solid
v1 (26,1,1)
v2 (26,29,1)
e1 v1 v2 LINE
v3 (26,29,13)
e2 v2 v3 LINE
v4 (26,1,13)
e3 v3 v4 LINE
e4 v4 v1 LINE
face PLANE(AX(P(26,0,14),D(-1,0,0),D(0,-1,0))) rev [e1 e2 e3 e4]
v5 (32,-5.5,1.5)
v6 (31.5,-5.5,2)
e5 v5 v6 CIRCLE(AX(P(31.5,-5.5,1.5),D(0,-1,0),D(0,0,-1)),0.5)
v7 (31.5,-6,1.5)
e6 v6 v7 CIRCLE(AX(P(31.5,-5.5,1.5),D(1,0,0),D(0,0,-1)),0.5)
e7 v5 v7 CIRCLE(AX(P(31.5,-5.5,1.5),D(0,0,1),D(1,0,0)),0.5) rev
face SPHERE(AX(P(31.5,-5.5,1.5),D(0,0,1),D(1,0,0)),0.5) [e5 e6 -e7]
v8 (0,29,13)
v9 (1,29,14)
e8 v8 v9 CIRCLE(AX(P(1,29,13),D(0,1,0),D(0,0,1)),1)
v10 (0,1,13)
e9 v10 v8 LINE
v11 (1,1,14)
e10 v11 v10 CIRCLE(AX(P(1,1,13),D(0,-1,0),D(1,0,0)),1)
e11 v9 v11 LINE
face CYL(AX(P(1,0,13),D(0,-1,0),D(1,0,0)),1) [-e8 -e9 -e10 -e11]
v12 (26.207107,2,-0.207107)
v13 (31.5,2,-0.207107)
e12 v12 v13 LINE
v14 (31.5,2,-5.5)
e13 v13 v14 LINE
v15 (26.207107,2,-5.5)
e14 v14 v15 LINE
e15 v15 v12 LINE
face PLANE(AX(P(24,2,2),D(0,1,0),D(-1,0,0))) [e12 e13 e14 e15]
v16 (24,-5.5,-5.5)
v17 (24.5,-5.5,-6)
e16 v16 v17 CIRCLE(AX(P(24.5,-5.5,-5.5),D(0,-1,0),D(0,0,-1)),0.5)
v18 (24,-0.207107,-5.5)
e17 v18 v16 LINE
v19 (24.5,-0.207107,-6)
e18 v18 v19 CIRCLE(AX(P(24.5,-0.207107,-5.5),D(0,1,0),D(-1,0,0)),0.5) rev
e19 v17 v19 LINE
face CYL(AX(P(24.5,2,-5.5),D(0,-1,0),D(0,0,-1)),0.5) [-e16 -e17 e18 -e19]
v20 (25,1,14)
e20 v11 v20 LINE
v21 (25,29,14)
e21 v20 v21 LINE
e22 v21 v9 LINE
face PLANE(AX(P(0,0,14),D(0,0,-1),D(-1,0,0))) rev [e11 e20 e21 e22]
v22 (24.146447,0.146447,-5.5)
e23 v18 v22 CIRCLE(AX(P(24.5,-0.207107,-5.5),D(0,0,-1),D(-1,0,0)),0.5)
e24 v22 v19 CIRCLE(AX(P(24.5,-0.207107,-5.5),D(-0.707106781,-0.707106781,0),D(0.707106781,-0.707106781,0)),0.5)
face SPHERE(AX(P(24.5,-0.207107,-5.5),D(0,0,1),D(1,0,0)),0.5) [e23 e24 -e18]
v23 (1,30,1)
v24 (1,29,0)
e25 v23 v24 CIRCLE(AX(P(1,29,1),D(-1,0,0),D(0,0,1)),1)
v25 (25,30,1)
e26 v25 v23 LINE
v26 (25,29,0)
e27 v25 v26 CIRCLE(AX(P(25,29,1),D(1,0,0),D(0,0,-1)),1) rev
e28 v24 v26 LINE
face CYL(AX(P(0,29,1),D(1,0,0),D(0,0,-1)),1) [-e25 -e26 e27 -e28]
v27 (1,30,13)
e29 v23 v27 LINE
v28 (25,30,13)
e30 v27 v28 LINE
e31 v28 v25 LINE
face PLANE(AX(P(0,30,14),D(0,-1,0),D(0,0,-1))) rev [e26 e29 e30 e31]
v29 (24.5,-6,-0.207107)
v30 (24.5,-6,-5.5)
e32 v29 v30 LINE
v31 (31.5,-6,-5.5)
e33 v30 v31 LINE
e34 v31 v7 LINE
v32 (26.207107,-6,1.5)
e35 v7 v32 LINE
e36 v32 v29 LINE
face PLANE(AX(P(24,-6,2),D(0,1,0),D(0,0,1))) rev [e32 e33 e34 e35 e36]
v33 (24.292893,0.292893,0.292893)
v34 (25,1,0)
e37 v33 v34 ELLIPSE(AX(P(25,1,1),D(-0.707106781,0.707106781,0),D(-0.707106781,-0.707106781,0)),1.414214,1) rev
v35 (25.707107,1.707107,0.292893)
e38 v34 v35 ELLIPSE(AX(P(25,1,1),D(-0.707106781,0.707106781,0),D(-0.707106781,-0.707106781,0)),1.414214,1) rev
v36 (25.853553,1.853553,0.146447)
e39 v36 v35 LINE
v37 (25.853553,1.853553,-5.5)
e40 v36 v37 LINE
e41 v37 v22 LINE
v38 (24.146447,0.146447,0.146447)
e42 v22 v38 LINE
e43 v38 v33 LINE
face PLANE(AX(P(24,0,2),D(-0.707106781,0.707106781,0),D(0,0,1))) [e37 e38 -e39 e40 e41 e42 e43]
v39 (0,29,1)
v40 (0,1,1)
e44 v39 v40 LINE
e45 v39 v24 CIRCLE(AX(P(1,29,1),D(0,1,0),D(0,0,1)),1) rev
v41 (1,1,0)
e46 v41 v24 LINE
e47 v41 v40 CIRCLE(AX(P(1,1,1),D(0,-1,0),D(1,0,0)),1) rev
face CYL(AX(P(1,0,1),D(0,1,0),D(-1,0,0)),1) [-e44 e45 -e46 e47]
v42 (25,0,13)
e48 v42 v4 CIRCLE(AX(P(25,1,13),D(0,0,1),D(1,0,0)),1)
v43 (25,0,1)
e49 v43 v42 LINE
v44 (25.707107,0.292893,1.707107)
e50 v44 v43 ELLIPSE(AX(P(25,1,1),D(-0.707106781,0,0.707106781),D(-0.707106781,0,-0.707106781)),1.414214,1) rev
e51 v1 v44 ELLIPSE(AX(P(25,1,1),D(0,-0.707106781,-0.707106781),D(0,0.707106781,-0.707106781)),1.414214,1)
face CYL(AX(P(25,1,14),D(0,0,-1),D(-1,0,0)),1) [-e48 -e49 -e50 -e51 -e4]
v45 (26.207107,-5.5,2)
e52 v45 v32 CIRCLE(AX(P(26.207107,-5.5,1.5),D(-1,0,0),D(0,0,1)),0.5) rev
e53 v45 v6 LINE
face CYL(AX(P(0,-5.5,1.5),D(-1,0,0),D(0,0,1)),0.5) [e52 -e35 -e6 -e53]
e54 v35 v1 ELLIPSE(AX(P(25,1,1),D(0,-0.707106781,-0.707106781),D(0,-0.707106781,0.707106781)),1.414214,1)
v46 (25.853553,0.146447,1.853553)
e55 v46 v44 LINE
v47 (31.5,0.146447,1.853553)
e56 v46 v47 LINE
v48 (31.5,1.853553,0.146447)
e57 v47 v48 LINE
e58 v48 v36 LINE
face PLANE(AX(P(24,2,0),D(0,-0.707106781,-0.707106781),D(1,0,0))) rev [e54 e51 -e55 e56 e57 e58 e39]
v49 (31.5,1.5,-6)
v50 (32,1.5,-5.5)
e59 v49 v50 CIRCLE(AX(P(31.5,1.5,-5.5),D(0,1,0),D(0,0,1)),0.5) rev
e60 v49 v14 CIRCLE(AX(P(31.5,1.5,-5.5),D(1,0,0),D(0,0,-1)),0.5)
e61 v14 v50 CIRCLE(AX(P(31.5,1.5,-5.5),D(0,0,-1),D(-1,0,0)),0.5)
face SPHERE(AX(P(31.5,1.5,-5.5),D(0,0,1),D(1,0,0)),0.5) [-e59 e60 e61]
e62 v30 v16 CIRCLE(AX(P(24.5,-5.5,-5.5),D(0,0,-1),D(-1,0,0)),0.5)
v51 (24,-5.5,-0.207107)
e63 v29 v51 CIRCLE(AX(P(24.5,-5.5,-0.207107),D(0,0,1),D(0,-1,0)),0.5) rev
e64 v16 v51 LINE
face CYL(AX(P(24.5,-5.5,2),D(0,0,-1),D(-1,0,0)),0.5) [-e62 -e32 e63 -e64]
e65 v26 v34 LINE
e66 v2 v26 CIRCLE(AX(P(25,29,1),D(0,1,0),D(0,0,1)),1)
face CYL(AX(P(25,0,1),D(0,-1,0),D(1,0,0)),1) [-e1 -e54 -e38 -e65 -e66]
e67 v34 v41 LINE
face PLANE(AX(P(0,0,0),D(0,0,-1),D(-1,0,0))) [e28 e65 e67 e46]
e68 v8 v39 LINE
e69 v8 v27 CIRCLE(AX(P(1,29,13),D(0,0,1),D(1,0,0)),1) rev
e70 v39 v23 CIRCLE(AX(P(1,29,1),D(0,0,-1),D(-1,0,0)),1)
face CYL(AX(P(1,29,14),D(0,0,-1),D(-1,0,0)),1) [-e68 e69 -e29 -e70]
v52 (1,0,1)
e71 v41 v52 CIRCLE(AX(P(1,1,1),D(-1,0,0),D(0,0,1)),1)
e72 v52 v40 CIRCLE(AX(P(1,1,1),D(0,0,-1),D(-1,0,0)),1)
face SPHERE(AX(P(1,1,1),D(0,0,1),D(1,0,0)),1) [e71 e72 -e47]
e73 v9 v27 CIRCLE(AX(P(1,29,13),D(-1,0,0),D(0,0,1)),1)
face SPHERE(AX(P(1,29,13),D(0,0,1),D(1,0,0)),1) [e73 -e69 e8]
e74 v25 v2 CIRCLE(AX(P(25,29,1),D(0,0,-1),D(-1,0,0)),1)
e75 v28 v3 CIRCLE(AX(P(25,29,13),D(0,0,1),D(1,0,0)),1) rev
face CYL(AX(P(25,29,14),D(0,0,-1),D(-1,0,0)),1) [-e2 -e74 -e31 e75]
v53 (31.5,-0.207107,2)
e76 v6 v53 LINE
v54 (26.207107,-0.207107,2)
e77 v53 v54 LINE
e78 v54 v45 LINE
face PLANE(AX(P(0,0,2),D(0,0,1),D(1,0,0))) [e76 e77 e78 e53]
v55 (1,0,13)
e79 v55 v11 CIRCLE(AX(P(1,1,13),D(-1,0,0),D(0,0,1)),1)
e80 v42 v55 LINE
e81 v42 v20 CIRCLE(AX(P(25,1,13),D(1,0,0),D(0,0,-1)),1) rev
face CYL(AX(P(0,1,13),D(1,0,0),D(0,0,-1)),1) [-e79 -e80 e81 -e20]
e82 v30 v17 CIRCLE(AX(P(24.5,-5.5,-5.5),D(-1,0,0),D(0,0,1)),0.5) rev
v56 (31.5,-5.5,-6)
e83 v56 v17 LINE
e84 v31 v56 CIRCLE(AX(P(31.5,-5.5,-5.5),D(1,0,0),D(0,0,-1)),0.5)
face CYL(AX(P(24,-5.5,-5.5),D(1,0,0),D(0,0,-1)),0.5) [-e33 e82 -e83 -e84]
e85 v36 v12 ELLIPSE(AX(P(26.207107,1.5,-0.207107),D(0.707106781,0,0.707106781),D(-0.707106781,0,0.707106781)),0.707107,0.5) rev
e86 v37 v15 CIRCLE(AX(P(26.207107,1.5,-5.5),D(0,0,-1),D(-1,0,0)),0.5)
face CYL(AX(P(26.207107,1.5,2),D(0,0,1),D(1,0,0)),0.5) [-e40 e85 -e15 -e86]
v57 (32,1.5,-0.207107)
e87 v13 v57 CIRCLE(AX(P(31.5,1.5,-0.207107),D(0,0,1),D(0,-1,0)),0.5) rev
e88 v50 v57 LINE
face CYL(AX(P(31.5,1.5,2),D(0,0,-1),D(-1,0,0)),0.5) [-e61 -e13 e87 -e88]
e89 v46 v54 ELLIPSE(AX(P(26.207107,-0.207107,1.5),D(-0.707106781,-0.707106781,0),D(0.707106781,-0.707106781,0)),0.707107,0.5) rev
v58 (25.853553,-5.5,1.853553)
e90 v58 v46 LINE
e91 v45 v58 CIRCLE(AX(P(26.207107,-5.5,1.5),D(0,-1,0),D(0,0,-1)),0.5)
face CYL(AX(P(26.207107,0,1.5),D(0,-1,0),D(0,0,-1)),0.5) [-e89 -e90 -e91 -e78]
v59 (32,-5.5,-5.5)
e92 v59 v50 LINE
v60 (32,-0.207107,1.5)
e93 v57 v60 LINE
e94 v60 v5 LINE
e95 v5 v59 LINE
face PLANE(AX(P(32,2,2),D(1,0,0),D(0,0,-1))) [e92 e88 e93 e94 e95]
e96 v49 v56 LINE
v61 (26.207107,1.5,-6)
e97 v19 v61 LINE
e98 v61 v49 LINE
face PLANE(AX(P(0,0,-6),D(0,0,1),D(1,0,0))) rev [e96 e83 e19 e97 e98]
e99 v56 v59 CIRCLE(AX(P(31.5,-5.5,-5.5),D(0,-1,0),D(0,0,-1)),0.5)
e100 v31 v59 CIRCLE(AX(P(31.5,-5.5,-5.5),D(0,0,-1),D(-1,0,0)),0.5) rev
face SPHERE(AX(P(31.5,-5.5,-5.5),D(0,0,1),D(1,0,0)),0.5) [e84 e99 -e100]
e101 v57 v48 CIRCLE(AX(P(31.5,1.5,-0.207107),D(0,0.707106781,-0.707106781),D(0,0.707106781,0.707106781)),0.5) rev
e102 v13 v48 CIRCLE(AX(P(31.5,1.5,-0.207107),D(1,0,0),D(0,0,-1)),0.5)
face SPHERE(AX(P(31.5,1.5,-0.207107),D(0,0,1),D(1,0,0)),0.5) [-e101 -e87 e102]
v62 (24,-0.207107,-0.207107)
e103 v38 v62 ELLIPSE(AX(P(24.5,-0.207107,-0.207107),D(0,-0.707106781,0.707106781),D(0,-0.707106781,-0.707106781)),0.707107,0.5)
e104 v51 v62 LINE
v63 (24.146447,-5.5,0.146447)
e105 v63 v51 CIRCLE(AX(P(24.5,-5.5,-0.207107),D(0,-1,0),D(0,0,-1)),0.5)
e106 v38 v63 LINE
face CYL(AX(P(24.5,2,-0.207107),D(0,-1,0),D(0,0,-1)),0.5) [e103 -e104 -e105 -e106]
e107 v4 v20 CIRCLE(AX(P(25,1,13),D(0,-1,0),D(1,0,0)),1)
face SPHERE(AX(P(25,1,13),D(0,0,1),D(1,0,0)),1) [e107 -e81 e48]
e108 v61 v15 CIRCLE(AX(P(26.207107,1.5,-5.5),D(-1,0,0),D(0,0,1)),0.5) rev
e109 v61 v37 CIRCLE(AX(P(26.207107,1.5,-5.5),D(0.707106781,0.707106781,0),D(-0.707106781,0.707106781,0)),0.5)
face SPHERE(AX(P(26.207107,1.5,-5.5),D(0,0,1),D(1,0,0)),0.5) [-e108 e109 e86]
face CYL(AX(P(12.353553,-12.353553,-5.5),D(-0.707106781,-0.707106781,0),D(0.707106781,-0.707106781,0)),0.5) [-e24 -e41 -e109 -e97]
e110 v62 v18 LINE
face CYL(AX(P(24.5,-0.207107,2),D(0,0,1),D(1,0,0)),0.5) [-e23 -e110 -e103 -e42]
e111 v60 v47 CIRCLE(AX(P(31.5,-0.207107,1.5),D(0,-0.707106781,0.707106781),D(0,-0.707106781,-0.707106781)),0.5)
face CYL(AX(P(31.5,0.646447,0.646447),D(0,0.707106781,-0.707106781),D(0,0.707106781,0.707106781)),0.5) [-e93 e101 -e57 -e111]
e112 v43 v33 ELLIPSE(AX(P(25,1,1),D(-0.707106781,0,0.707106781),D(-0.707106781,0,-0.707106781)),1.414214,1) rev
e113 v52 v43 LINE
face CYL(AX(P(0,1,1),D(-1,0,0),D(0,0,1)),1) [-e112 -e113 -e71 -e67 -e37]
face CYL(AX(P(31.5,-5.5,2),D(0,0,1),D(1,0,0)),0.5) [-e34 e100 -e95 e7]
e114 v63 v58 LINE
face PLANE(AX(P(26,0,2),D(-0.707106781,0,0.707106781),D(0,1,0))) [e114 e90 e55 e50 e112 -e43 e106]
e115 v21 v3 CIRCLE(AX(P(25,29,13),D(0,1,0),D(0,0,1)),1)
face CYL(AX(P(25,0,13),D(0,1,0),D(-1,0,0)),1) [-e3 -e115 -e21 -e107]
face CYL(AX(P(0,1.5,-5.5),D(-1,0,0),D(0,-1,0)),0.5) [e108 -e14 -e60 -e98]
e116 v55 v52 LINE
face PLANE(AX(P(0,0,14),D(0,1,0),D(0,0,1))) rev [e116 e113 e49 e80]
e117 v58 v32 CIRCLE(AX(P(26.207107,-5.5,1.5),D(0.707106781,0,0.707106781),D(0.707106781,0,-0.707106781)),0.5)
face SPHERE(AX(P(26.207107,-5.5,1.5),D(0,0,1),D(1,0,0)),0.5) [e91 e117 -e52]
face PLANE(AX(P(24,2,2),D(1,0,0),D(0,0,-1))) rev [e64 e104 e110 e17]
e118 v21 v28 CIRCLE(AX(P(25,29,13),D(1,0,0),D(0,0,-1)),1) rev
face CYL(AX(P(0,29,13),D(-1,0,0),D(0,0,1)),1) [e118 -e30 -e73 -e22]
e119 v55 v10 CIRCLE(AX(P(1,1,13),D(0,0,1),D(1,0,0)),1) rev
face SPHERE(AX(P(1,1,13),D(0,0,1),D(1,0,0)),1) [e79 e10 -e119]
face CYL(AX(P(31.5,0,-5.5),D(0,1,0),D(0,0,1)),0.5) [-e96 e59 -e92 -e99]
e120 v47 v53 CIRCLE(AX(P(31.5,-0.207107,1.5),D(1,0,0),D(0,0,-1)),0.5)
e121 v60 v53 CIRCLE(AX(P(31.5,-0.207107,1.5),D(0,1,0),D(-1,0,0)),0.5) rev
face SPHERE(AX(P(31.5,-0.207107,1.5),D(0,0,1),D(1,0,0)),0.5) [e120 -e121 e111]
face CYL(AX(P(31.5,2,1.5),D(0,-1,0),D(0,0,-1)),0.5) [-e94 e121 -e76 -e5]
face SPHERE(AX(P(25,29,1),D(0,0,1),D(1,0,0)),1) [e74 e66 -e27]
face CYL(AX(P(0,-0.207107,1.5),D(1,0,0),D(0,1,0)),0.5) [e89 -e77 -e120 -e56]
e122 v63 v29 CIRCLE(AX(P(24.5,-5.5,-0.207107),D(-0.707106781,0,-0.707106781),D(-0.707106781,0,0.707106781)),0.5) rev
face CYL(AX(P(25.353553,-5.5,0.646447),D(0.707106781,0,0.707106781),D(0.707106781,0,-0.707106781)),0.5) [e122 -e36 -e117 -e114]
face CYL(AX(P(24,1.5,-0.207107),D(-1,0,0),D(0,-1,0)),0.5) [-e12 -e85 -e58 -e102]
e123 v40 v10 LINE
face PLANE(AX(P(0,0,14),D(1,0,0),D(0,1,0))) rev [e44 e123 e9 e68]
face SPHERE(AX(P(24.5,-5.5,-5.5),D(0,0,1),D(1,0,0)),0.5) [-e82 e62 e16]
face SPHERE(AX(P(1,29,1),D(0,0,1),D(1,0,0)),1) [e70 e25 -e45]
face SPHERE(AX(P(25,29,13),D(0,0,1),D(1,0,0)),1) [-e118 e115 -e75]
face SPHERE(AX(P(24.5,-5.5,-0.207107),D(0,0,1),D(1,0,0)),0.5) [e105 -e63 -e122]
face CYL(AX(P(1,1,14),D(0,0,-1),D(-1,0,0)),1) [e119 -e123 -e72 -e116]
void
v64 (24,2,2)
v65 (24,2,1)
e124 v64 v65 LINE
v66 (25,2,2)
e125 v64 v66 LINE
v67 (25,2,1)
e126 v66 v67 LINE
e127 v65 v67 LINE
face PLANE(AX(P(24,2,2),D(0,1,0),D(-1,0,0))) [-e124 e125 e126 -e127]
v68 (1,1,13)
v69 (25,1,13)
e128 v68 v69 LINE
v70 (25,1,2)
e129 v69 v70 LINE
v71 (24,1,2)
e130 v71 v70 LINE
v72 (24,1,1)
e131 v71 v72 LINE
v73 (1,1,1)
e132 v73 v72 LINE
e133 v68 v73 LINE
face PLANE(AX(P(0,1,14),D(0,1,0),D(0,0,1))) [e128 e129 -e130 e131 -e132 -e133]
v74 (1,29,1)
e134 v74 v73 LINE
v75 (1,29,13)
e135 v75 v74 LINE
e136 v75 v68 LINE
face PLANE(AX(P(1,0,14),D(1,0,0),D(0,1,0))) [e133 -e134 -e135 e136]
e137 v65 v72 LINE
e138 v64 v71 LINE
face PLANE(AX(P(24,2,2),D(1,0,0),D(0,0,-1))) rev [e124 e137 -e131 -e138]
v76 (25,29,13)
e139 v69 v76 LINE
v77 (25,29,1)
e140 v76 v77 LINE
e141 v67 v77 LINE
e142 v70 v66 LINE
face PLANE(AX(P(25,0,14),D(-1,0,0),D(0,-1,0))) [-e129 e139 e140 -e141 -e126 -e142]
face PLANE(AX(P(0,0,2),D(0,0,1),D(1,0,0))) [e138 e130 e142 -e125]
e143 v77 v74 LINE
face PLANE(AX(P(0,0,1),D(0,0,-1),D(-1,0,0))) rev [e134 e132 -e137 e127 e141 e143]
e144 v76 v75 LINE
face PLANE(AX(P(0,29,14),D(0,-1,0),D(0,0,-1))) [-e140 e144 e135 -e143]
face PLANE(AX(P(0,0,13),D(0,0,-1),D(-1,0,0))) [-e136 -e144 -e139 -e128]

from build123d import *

# Parameters (mm, degrees)
SKETCH1_W                = 26
SKETCH1_H                = 30
BOSS_EXTRUDE1_DEPTH      = 14
SHELL1_T                 = 1
BOSS_EXTRUDE3_DEPTH      = 6
BOSS_EXTRUDE3_DEPTH_BACK = 2
SKETCH2_W                = 8
SKETCH2_H                = 8
CHAMFER2_SIZE            = 2
FILLET1_R                = 1
FILLET2_R                = 0.5


with BuildPart() as part:
    # Sketch1 → Boss-Extrude1 (new body)
    with BuildSketch(Plane.XY):
        with Locations((13, 15)):
            Rectangle(SKETCH1_W, SKETCH1_H)
    extrude(amount=BOSS_EXTRUDE1_DEPTH)

    # Shell1 (no face opened: a closed hollow body)
    add(offset(amount=-SHELL1_T, mode=Mode.PRIVATE), mode=Mode.SUBTRACT)

    # Sketch2 → Boss-Extrude3 (add, two sides: drawn at the far end of the back side and taken through both)
    with BuildSketch(Plane(origin=(0, 0, 0), x_dir=(-1, 0, 0), z_dir=(0, 0, -1)).offset(-BOSS_EXTRUDE3_DEPTH_BACK)):
        with Locations((-28, -2)):
            Rectangle(SKETCH2_W, SKETCH2_H)
    extrude(amount=BOSS_EXTRUDE3_DEPTH + BOSS_EXTRUDE3_DEPTH_BACK)

    # Chamfer2
    chamfer2_edges = [part.edges().sort_by_distance(p)[0] for p in [
        (24, -3, 2),
        (24, 2, -3),
        (29, 2, 2),
    ]]
    chamfer(chamfer2_edges, length=CHAMFER2_SIZE)

    # Fillet1
    # the kernel refuses this fillet: 1 mm, written as the material it takes off along each edge
    with BuildSketch(Plane(origin=(1, 29, 1), x_dir=(0, 1, 0), z_dir=(0, 0, -1))) as fillet1_piece_1_section:
        Polygon((0, 0), (FILLET1_R, 0), (FILLET1_R, -FILLET1_R), (0, -FILLET1_R), align=None)
    fillet1_piece_1 = extrude(amount=FILLET1_R, mode=Mode.PRIVATE)
    fillet1_piece_1 = fillet1_piece_1 - Plane(origin=(1, 29, 1), x_dir=(0.7071067811865476, -0.7071067811865475, 0), z_dir=(0, 0, -1)) * Sphere(FILLET1_R, mode=Mode.PRIVATE)
    add(fillet1_piece_1, mode=Mode.SUBTRACT)
    with BuildSketch(Plane(origin=(1, 1, 1), x_dir=(0, 0, -1), z_dir=(0, -1, 0))) as fillet1_piece_2_section:
        Polygon((0, 0), (FILLET1_R, 0), (FILLET1_R, -FILLET1_R), (0, -FILLET1_R), align=None)
    fillet1_piece_2 = extrude(amount=FILLET1_R, mode=Mode.PRIVATE)
    fillet1_piece_2 = fillet1_piece_2 - Plane(origin=(1, 1, 1), x_dir=(0.7071067811865475, 0, 0.7071067811865475), z_dir=(0, -1, 0)) * Sphere(FILLET1_R, mode=Mode.PRIVATE)
    add(fillet1_piece_2, mode=Mode.SUBTRACT)
    with BuildSketch(Plane(origin=(25, 29, 1), x_dir=(0, 0, -1), z_dir=(0, 1, 0))) as fillet1_piece_3_section:
        Polygon((0, 0), (FILLET1_R, 0), (FILLET1_R, -FILLET1_R), (0, -FILLET1_R), align=None)
    fillet1_piece_3 = extrude(amount=FILLET1_R, mode=Mode.PRIVATE)
    fillet1_piece_3 = fillet1_piece_3 - Plane(origin=(25, 29, 1), x_dir=(-0.7071067811865475, 0, 0.7071067811865475), z_dir=(0, 1, 0)) * Sphere(FILLET1_R, mode=Mode.PRIVATE)
    add(fillet1_piece_3, mode=Mode.SUBTRACT)
    with BuildSketch(Plane(origin=(1, 1, 13), x_dir=(-1, 0, 0), z_dir=(0, -1, 0))) as fillet1_piece_4_section:
        Polygon((0, 0), (FILLET1_R, 0), (FILLET1_R, -FILLET1_R), (0, -FILLET1_R), align=None)
    fillet1_piece_4 = extrude(amount=FILLET1_R, mode=Mode.PRIVATE)
    fillet1_piece_4 = fillet1_piece_4 - Plane(origin=(1, 1, 13), x_dir=(0.7071067811865475, 0, -0.7071067811865475), z_dir=(0, -1, 0)) * Sphere(FILLET1_R, mode=Mode.PRIVATE)
    add(fillet1_piece_4, mode=Mode.SUBTRACT)
    with BuildSketch(Plane(origin=(25, 1, 13), x_dir=(1, 0, 0), z_dir=(0, -1, 0))) as fillet1_piece_5_section:
        Polygon((0, 0), (FILLET1_R, 0), (FILLET1_R, FILLET1_R), (0, FILLET1_R), align=None)
    fillet1_piece_5 = extrude(amount=FILLET1_R, mode=Mode.PRIVATE)
    fillet1_piece_5 = fillet1_piece_5 - Plane(origin=(25, 1, 13), x_dir=(-0.7071067811865475, 0, -0.7071067811865475), z_dir=(0, -1, 0)) * Sphere(FILLET1_R, mode=Mode.PRIVATE)
    add(fillet1_piece_5, mode=Mode.SUBTRACT)
    with BuildSketch(Plane(origin=(25, 29, 13), x_dir=(1, 0, 0), z_dir=(0, 1, 0))) as fillet1_piece_6_section:
        Polygon((0, 0), (FILLET1_R, 0), (FILLET1_R, -FILLET1_R), (0, -FILLET1_R), align=None)
    fillet1_piece_6 = extrude(amount=FILLET1_R, mode=Mode.PRIVATE)
    fillet1_piece_6 = fillet1_piece_6 - Plane(origin=(25, 29, 13), x_dir=(-0.7071067811865475, 0, -0.7071067811865475), z_dir=(0, 1, 0)) * Sphere(FILLET1_R, mode=Mode.PRIVATE)
    add(fillet1_piece_6, mode=Mode.SUBTRACT)
    with BuildSketch(Plane(origin=(1, 29, 13), x_dir=(-1, 0, 0), z_dir=(0, 1, 0))) as fillet1_piece_7_section:
        Polygon((0, 0), (FILLET1_R, 0), (FILLET1_R, FILLET1_R), (0, FILLET1_R), align=None)
    fillet1_piece_7 = extrude(amount=FILLET1_R, mode=Mode.PRIVATE)
    fillet1_piece_7 = fillet1_piece_7 - Plane(origin=(1, 29, 13), x_dir=(0.7071067811865475, 0, -0.7071067811865475), z_dir=(0, 1, 0)) * Sphere(FILLET1_R, mode=Mode.PRIVATE)
    add(fillet1_piece_7, mode=Mode.SUBTRACT)
    with BuildSketch(Plane(origin=(0, 29, 0), x_dir=(1, 0, 0), z_dir=(0, -1, 0)), Plane(origin=(26, 1, 14), x_dir=(0, 0, -1), z_dir=(0, 1, 0)), Plane(origin=(0, 29, 14), x_dir=(0, 0, -1), z_dir=(0, -1, 0))) as fillet1_piece_8:
        with BuildLine():
            CenterArc((FILLET1_R, FILLET1_R), FILLET1_R, 180, 90)
            Line((0, FILLET1_R), (0, 0))
            Line((0, 0), (FILLET1_R, 0))
        make_face()
    extrude(amount=28, mode=Mode.SUBTRACT)
    with BuildSketch(Plane(origin=(1, 0, 0), x_dir=(0, 0, 1), z_dir=(1, 0, 0))) as fillet1_piece_9_section:
        with BuildLine():
            CenterArc((FILLET1_R, -FILLET1_R), FILLET1_R, 90, 90)
            Line((0, -FILLET1_R), (0, 0))
            Line((0, 0), (FILLET1_R, 0))
        make_face()
    fillet1_piece_9 = extrude(amount=25.5, mode=Mode.PRIVATE)
    fillet1_piece_9 = split(fillet1_piece_9, bisect_by=Plane(origin=(18.381826638, 0.226414546, -5.618173362), z_dir=(-0.7071067811865476, 0, 0.7071067811865476)), keep=Keep.TOP, mode=Mode.PRIVATE)
    fillet1_piece_9 = split(fillet1_piece_9, bisect_by=Plane(origin=(18.381826638, -5.618173362, 0.226414546), z_dir=(-0.7071067811865476, 0.7071067811865476, 0)), keep=Keep.TOP, mode=Mode.PRIVATE)
    add(fillet1_piece_9, mode=Mode.SUBTRACT)
    with BuildSketch(Plane(origin=(1, 0, 0), x_dir=(0, 0, 1), z_dir=(1, 0, 0))) as fillet1_piece_10_section:
        with BuildLine():
            CenterArc((FILLET1_R, -FILLET1_R), FILLET1_R, 90, 90)
            Line((0, -FILLET1_R), (0, 0))
            Line((0, 0), (FILLET1_R, 0))
        make_face()
    fillet1_piece_10 = extrude(amount=25.5, mode=Mode.PRIVATE)
    fillet1_piece_10 = split(fillet1_piece_10, bisect_by=Plane(origin=(24.16446835, 0.528927527, 0.16446835), z_dir=(0.7071067811865476, 0, -0.7071067811865476)), keep=Keep.TOP, mode=Mode.PRIVATE)
    fillet1_piece_10 = split(fillet1_piece_10, bisect_by=Plane(origin=(24.407441135, 0.407441135, 0.042981958), z_dir=(-0.7071067811865476, 0.7071067811865476, 0)), keep=Keep.TOP, mode=Mode.PRIVATE)
    add(fillet1_piece_10, mode=Mode.SUBTRACT)
    with BuildSketch(Plane(origin=(1, 0, 0), x_dir=(0, 0, 1), z_dir=(1, 0, 0))) as fillet1_piece_11_section:
        with BuildLine():
            CenterArc((FILLET1_R, -FILLET1_R), FILLET1_R, 90, 90)
            Line((0, -FILLET1_R), (0, 0))
            Line((0, 0), (FILLET1_R, 0))
        make_face()
    fillet1_piece_11 = extrude(amount=25.5, mode=Mode.PRIVATE)
    fillet1_piece_11 = split(fillet1_piece_11, bisect_by=Plane(origin=(24.407441135, 0.042981958, 0.407441135), z_dir=(-0.7071067811865476, 0, 0.7071067811865476)), keep=Keep.TOP, mode=Mode.PRIVATE)
    fillet1_piece_11 = split(fillet1_piece_11, bisect_by=Plane(origin=(24.16446835, 0.16446835, 0.528927527), z_dir=(0.7071067811865476, -0.7071067811865476, 0)), keep=Keep.TOP, mode=Mode.PRIVATE)
    add(fillet1_piece_11, mode=Mode.SUBTRACT)
    with BuildSketch(Plane(origin=(26, -0.5, 0), x_dir=(-1, 0, 0), z_dir=(0, 1, 0))) as fillet1_piece_12_section:
        with BuildLine():
            CenterArc((FILLET1_R, FILLET1_R), FILLET1_R, 180, 90)
            Line((0, FILLET1_R), (0, 0))
            Line((0, 0), (FILLET1_R, 0))
        make_face()
    fillet1_piece_12 = extrude(amount=29.5, mode=Mode.PRIVATE)
    fillet1_piece_12 = split(fillet1_piece_12, bisect_by=Plane(origin=(25.83553165, 1.83553165, 0.528927527), z_dir=(0.7071067811865476, -0.7071067811865476, 0)), keep=Keep.TOP, mode=Mode.PRIVATE)
    fillet1_piece_12 = split(fillet1_piece_12, bisect_by=Plane(origin=(25.957018042, 1.592558865, 0.407441135), z_dir=(0, 0.7071067811865476, 0.7071067811865476)), keep=Keep.TOP, mode=Mode.PRIVATE)
    add(fillet1_piece_12, mode=Mode.SUBTRACT)
    with BuildSketch(Plane(origin=(26, -0.5, 0), x_dir=(-1, 0, 0), z_dir=(0, 1, 0))) as fillet1_piece_13_section:
        with BuildLine():
            CenterArc((FILLET1_R, FILLET1_R), FILLET1_R, 180, 90)
            Line((0, FILLET1_R), (0, 0))
            Line((0, 0), (FILLET1_R, 0))
        make_face()
    fillet1_piece_13 = extrude(amount=29.5, mode=Mode.PRIVATE)
    fillet1_piece_13 = split(fillet1_piece_13, bisect_by=Plane(origin=(25.592558865, 1.592558865, 0.042981958), z_dir=(-0.7071067811865476, 0.7071067811865476, 0)), keep=Keep.TOP, mode=Mode.PRIVATE)
    fillet1_piece_13 = split(fillet1_piece_13, bisect_by=Plane(origin=(25.471072473, 1.83553165, 0.16446835), z_dir=(0, -0.7071067811865476, -0.7071067811865476)), keep=Keep.TOP, mode=Mode.PRIVATE)
    add(fillet1_piece_13, mode=Mode.SUBTRACT)
    with BuildSketch(Plane(origin=(26, -0.5, 0), x_dir=(-1, 0, 0), z_dir=(0, 1, 0))) as fillet1_piece_14_section:
        with BuildLine():
            CenterArc((FILLET1_R, FILLET1_R), FILLET1_R, 180, 90)
            Line((0, FILLET1_R), (0, 0))
            Line((0, 0), (FILLET1_R, 0))
        make_face()
    fillet1_piece_14 = extrude(amount=29.5, mode=Mode.PRIVATE)
    fillet1_piece_14 = split(fillet1_piece_14, bisect_by=Plane(origin=(32.618183131, 8.618183131, 0.226411675), z_dir=(-0.7071067811865476, 0.7071067811865476, 0)), keep=Keep.TOP, mode=Mode.PRIVATE)
    fillet1_piece_14 = split(fillet1_piece_14, bisect_by=Plane(origin=(25.773588325, 8.618183131, -6.618183131), z_dir=(0, 0.7071067811865476, 0.7071067811865476)), keep=Keep.TOP, mode=Mode.PRIVATE)
    add(fillet1_piece_14, mode=Mode.SUBTRACT)
    with BuildSketch(Plane(origin=(25, 30, 0), x_dir=(0, -1, 0), z_dir=(-1, 0, 0)), Plane(origin=(1, 0, 14), x_dir=(0, 0, -1), z_dir=(1, 0, 0))) as fillet1_piece_15:
        with BuildLine():
            CenterArc((FILLET1_R, FILLET1_R), FILLET1_R, 180, 90)
            Line((0, FILLET1_R), (0, 0))
            Line((0, 0), (FILLET1_R, 0))
        make_face()
    extrude(amount=24, mode=Mode.SUBTRACT)
    with BuildSketch(Plane(origin=(25, 30, 14), x_dir=(0, -1, 0), z_dir=(-1, 0, 0))) as fillet1_piece_16:
        with BuildLine():
            CenterArc((FILLET1_R, -FILLET1_R), FILLET1_R, 90, 90)
            Line((0, -FILLET1_R), (0, 0))
            Line((0, 0), (FILLET1_R, 0))
        make_face()
    extrude(amount=24, mode=Mode.SUBTRACT)
    with BuildSketch(Plane(origin=(0, 30, 1), x_dir=(0, -1, 0), z_dir=(0, 0, 1)), Plane(origin=(0, 0, 1), x_dir=(1, 0, 0), z_dir=(0, 0, 1))) as fillet1_piece_17:
        with BuildLine():
            CenterArc((FILLET1_R, FILLET1_R), FILLET1_R, 180, 90)
            Line((0, FILLET1_R), (0, 0))
            Line((0, 0), (FILLET1_R, 0))
        make_face()
    extrude(amount=12, mode=Mode.SUBTRACT)
    with BuildSketch(Plane(origin=(26, 30, 1), x_dir=(0, -1, 0), z_dir=(0, 0, 1))) as fillet1_piece_18:
        with BuildLine():
            CenterArc((FILLET1_R, -FILLET1_R), FILLET1_R, 90, 90)
            Line((0, -FILLET1_R), (0, 0))
            Line((0, 0), (FILLET1_R, 0))
        make_face()
    extrude(amount=12, mode=Mode.SUBTRACT)
    with BuildSketch(Plane(origin=(26, 0, -0.5), x_dir=(-1, 0, 0), z_dir=(0, 0, 1))) as fillet1_piece_19_section:
        with BuildLine():
            CenterArc((FILLET1_R, -FILLET1_R), FILLET1_R, 90, 90)
            Line((0, -FILLET1_R), (0, 0))
            Line((0, 0), (FILLET1_R, 0))
        make_face()
    fillet1_piece_19 = extrude(amount=13.5, mode=Mode.PRIVATE)
    fillet1_piece_19 = split(fillet1_piece_19, bisect_by=Plane(origin=(25.83553165, 0.528927527, 1.83553165), z_dir=(0.7071067811865476, 0, -0.7071067811865476)), keep=Keep.TOP, mode=Mode.PRIVATE)
    fillet1_piece_19 = split(fillet1_piece_19, bisect_by=Plane(origin=(25.957018042, 0.407441135, 1.592558865), z_dir=(0, 0.7071067811865476, 0.7071067811865476)), keep=Keep.TOP, mode=Mode.PRIVATE)
    add(fillet1_piece_19, mode=Mode.SUBTRACT)
    with BuildSketch(Plane(origin=(26, 0, -0.5), x_dir=(-1, 0, 0), z_dir=(0, 0, 1))) as fillet1_piece_20_section:
        with BuildLine():
            CenterArc((FILLET1_R, -FILLET1_R), FILLET1_R, 90, 90)
            Line((0, -FILLET1_R), (0, 0))
            Line((0, 0), (FILLET1_R, 0))
        make_face()
    fillet1_piece_20 = extrude(amount=13.5, mode=Mode.PRIVATE)
    fillet1_piece_20 = split(fillet1_piece_20, bisect_by=Plane(origin=(25.592558865, 0.042981958, 1.592558865), z_dir=(-0.7071067811865476, 0, 0.7071067811865476)), keep=Keep.TOP, mode=Mode.PRIVATE)
    fillet1_piece_20 = split(fillet1_piece_20, bisect_by=Plane(origin=(25.471072473, 0.16446835, 1.83553165), z_dir=(0, -0.7071067811865476, -0.7071067811865476)), keep=Keep.TOP, mode=Mode.PRIVATE)
    add(fillet1_piece_20, mode=Mode.SUBTRACT)
    with BuildSketch(Plane(origin=(26, 0, -0.5), x_dir=(-1, 0, 0), z_dir=(0, 0, 1))) as fillet1_piece_21_section:
        with BuildLine():
            CenterArc((FILLET1_R, -FILLET1_R), FILLET1_R, 90, 90)
            Line((0, -FILLET1_R), (0, 0))
            Line((0, 0), (FILLET1_R, 0))
        make_face()
    fillet1_piece_21 = extrude(amount=13.5, mode=Mode.PRIVATE)
    fillet1_piece_21 = split(fillet1_piece_21, bisect_by=Plane(origin=(28.618101716, 0.226435602, 4.618101716), z_dir=(-0.7071067811865476, 0, 0.7071067811865476)), keep=Keep.TOP, mode=Mode.PRIVATE)
    fillet1_piece_21 = split(fillet1_piece_21, bisect_by=Plane(origin=(25.773564398, -2.618101716, 4.618101716), z_dir=(0, 0.7071067811865476, 0.7071067811865476)), keep=Keep.TOP, mode=Mode.PRIVATE)
    add(fillet1_piece_21, mode=Mode.SUBTRACT)

    # Fillet2
    fillet2_edges = [part.edges().sort_by_distance(p)[0] for p in [
        (28, -6, -6),
        (32, -6, -2),
        (32, -2, -6),
        (32, 2, -3),
        (29, 2, -6),
        (26, 2, -3),
        (29, 2, 0),
        (32, -3, 2),
        (32, 1, 1),
        (29, -6, 2),
        (26, -3, 2),
        (29, 0, 2),
        (24, -3, -6),
        (24, -6, -3),
        (24, -3, 0),
        (24, 0, -3),
        (25, 1, -6),
        (25, -6, 1),
    ]]
    fillet(fillet2_edges, radius=FILLET2_R)


solid = part.part
